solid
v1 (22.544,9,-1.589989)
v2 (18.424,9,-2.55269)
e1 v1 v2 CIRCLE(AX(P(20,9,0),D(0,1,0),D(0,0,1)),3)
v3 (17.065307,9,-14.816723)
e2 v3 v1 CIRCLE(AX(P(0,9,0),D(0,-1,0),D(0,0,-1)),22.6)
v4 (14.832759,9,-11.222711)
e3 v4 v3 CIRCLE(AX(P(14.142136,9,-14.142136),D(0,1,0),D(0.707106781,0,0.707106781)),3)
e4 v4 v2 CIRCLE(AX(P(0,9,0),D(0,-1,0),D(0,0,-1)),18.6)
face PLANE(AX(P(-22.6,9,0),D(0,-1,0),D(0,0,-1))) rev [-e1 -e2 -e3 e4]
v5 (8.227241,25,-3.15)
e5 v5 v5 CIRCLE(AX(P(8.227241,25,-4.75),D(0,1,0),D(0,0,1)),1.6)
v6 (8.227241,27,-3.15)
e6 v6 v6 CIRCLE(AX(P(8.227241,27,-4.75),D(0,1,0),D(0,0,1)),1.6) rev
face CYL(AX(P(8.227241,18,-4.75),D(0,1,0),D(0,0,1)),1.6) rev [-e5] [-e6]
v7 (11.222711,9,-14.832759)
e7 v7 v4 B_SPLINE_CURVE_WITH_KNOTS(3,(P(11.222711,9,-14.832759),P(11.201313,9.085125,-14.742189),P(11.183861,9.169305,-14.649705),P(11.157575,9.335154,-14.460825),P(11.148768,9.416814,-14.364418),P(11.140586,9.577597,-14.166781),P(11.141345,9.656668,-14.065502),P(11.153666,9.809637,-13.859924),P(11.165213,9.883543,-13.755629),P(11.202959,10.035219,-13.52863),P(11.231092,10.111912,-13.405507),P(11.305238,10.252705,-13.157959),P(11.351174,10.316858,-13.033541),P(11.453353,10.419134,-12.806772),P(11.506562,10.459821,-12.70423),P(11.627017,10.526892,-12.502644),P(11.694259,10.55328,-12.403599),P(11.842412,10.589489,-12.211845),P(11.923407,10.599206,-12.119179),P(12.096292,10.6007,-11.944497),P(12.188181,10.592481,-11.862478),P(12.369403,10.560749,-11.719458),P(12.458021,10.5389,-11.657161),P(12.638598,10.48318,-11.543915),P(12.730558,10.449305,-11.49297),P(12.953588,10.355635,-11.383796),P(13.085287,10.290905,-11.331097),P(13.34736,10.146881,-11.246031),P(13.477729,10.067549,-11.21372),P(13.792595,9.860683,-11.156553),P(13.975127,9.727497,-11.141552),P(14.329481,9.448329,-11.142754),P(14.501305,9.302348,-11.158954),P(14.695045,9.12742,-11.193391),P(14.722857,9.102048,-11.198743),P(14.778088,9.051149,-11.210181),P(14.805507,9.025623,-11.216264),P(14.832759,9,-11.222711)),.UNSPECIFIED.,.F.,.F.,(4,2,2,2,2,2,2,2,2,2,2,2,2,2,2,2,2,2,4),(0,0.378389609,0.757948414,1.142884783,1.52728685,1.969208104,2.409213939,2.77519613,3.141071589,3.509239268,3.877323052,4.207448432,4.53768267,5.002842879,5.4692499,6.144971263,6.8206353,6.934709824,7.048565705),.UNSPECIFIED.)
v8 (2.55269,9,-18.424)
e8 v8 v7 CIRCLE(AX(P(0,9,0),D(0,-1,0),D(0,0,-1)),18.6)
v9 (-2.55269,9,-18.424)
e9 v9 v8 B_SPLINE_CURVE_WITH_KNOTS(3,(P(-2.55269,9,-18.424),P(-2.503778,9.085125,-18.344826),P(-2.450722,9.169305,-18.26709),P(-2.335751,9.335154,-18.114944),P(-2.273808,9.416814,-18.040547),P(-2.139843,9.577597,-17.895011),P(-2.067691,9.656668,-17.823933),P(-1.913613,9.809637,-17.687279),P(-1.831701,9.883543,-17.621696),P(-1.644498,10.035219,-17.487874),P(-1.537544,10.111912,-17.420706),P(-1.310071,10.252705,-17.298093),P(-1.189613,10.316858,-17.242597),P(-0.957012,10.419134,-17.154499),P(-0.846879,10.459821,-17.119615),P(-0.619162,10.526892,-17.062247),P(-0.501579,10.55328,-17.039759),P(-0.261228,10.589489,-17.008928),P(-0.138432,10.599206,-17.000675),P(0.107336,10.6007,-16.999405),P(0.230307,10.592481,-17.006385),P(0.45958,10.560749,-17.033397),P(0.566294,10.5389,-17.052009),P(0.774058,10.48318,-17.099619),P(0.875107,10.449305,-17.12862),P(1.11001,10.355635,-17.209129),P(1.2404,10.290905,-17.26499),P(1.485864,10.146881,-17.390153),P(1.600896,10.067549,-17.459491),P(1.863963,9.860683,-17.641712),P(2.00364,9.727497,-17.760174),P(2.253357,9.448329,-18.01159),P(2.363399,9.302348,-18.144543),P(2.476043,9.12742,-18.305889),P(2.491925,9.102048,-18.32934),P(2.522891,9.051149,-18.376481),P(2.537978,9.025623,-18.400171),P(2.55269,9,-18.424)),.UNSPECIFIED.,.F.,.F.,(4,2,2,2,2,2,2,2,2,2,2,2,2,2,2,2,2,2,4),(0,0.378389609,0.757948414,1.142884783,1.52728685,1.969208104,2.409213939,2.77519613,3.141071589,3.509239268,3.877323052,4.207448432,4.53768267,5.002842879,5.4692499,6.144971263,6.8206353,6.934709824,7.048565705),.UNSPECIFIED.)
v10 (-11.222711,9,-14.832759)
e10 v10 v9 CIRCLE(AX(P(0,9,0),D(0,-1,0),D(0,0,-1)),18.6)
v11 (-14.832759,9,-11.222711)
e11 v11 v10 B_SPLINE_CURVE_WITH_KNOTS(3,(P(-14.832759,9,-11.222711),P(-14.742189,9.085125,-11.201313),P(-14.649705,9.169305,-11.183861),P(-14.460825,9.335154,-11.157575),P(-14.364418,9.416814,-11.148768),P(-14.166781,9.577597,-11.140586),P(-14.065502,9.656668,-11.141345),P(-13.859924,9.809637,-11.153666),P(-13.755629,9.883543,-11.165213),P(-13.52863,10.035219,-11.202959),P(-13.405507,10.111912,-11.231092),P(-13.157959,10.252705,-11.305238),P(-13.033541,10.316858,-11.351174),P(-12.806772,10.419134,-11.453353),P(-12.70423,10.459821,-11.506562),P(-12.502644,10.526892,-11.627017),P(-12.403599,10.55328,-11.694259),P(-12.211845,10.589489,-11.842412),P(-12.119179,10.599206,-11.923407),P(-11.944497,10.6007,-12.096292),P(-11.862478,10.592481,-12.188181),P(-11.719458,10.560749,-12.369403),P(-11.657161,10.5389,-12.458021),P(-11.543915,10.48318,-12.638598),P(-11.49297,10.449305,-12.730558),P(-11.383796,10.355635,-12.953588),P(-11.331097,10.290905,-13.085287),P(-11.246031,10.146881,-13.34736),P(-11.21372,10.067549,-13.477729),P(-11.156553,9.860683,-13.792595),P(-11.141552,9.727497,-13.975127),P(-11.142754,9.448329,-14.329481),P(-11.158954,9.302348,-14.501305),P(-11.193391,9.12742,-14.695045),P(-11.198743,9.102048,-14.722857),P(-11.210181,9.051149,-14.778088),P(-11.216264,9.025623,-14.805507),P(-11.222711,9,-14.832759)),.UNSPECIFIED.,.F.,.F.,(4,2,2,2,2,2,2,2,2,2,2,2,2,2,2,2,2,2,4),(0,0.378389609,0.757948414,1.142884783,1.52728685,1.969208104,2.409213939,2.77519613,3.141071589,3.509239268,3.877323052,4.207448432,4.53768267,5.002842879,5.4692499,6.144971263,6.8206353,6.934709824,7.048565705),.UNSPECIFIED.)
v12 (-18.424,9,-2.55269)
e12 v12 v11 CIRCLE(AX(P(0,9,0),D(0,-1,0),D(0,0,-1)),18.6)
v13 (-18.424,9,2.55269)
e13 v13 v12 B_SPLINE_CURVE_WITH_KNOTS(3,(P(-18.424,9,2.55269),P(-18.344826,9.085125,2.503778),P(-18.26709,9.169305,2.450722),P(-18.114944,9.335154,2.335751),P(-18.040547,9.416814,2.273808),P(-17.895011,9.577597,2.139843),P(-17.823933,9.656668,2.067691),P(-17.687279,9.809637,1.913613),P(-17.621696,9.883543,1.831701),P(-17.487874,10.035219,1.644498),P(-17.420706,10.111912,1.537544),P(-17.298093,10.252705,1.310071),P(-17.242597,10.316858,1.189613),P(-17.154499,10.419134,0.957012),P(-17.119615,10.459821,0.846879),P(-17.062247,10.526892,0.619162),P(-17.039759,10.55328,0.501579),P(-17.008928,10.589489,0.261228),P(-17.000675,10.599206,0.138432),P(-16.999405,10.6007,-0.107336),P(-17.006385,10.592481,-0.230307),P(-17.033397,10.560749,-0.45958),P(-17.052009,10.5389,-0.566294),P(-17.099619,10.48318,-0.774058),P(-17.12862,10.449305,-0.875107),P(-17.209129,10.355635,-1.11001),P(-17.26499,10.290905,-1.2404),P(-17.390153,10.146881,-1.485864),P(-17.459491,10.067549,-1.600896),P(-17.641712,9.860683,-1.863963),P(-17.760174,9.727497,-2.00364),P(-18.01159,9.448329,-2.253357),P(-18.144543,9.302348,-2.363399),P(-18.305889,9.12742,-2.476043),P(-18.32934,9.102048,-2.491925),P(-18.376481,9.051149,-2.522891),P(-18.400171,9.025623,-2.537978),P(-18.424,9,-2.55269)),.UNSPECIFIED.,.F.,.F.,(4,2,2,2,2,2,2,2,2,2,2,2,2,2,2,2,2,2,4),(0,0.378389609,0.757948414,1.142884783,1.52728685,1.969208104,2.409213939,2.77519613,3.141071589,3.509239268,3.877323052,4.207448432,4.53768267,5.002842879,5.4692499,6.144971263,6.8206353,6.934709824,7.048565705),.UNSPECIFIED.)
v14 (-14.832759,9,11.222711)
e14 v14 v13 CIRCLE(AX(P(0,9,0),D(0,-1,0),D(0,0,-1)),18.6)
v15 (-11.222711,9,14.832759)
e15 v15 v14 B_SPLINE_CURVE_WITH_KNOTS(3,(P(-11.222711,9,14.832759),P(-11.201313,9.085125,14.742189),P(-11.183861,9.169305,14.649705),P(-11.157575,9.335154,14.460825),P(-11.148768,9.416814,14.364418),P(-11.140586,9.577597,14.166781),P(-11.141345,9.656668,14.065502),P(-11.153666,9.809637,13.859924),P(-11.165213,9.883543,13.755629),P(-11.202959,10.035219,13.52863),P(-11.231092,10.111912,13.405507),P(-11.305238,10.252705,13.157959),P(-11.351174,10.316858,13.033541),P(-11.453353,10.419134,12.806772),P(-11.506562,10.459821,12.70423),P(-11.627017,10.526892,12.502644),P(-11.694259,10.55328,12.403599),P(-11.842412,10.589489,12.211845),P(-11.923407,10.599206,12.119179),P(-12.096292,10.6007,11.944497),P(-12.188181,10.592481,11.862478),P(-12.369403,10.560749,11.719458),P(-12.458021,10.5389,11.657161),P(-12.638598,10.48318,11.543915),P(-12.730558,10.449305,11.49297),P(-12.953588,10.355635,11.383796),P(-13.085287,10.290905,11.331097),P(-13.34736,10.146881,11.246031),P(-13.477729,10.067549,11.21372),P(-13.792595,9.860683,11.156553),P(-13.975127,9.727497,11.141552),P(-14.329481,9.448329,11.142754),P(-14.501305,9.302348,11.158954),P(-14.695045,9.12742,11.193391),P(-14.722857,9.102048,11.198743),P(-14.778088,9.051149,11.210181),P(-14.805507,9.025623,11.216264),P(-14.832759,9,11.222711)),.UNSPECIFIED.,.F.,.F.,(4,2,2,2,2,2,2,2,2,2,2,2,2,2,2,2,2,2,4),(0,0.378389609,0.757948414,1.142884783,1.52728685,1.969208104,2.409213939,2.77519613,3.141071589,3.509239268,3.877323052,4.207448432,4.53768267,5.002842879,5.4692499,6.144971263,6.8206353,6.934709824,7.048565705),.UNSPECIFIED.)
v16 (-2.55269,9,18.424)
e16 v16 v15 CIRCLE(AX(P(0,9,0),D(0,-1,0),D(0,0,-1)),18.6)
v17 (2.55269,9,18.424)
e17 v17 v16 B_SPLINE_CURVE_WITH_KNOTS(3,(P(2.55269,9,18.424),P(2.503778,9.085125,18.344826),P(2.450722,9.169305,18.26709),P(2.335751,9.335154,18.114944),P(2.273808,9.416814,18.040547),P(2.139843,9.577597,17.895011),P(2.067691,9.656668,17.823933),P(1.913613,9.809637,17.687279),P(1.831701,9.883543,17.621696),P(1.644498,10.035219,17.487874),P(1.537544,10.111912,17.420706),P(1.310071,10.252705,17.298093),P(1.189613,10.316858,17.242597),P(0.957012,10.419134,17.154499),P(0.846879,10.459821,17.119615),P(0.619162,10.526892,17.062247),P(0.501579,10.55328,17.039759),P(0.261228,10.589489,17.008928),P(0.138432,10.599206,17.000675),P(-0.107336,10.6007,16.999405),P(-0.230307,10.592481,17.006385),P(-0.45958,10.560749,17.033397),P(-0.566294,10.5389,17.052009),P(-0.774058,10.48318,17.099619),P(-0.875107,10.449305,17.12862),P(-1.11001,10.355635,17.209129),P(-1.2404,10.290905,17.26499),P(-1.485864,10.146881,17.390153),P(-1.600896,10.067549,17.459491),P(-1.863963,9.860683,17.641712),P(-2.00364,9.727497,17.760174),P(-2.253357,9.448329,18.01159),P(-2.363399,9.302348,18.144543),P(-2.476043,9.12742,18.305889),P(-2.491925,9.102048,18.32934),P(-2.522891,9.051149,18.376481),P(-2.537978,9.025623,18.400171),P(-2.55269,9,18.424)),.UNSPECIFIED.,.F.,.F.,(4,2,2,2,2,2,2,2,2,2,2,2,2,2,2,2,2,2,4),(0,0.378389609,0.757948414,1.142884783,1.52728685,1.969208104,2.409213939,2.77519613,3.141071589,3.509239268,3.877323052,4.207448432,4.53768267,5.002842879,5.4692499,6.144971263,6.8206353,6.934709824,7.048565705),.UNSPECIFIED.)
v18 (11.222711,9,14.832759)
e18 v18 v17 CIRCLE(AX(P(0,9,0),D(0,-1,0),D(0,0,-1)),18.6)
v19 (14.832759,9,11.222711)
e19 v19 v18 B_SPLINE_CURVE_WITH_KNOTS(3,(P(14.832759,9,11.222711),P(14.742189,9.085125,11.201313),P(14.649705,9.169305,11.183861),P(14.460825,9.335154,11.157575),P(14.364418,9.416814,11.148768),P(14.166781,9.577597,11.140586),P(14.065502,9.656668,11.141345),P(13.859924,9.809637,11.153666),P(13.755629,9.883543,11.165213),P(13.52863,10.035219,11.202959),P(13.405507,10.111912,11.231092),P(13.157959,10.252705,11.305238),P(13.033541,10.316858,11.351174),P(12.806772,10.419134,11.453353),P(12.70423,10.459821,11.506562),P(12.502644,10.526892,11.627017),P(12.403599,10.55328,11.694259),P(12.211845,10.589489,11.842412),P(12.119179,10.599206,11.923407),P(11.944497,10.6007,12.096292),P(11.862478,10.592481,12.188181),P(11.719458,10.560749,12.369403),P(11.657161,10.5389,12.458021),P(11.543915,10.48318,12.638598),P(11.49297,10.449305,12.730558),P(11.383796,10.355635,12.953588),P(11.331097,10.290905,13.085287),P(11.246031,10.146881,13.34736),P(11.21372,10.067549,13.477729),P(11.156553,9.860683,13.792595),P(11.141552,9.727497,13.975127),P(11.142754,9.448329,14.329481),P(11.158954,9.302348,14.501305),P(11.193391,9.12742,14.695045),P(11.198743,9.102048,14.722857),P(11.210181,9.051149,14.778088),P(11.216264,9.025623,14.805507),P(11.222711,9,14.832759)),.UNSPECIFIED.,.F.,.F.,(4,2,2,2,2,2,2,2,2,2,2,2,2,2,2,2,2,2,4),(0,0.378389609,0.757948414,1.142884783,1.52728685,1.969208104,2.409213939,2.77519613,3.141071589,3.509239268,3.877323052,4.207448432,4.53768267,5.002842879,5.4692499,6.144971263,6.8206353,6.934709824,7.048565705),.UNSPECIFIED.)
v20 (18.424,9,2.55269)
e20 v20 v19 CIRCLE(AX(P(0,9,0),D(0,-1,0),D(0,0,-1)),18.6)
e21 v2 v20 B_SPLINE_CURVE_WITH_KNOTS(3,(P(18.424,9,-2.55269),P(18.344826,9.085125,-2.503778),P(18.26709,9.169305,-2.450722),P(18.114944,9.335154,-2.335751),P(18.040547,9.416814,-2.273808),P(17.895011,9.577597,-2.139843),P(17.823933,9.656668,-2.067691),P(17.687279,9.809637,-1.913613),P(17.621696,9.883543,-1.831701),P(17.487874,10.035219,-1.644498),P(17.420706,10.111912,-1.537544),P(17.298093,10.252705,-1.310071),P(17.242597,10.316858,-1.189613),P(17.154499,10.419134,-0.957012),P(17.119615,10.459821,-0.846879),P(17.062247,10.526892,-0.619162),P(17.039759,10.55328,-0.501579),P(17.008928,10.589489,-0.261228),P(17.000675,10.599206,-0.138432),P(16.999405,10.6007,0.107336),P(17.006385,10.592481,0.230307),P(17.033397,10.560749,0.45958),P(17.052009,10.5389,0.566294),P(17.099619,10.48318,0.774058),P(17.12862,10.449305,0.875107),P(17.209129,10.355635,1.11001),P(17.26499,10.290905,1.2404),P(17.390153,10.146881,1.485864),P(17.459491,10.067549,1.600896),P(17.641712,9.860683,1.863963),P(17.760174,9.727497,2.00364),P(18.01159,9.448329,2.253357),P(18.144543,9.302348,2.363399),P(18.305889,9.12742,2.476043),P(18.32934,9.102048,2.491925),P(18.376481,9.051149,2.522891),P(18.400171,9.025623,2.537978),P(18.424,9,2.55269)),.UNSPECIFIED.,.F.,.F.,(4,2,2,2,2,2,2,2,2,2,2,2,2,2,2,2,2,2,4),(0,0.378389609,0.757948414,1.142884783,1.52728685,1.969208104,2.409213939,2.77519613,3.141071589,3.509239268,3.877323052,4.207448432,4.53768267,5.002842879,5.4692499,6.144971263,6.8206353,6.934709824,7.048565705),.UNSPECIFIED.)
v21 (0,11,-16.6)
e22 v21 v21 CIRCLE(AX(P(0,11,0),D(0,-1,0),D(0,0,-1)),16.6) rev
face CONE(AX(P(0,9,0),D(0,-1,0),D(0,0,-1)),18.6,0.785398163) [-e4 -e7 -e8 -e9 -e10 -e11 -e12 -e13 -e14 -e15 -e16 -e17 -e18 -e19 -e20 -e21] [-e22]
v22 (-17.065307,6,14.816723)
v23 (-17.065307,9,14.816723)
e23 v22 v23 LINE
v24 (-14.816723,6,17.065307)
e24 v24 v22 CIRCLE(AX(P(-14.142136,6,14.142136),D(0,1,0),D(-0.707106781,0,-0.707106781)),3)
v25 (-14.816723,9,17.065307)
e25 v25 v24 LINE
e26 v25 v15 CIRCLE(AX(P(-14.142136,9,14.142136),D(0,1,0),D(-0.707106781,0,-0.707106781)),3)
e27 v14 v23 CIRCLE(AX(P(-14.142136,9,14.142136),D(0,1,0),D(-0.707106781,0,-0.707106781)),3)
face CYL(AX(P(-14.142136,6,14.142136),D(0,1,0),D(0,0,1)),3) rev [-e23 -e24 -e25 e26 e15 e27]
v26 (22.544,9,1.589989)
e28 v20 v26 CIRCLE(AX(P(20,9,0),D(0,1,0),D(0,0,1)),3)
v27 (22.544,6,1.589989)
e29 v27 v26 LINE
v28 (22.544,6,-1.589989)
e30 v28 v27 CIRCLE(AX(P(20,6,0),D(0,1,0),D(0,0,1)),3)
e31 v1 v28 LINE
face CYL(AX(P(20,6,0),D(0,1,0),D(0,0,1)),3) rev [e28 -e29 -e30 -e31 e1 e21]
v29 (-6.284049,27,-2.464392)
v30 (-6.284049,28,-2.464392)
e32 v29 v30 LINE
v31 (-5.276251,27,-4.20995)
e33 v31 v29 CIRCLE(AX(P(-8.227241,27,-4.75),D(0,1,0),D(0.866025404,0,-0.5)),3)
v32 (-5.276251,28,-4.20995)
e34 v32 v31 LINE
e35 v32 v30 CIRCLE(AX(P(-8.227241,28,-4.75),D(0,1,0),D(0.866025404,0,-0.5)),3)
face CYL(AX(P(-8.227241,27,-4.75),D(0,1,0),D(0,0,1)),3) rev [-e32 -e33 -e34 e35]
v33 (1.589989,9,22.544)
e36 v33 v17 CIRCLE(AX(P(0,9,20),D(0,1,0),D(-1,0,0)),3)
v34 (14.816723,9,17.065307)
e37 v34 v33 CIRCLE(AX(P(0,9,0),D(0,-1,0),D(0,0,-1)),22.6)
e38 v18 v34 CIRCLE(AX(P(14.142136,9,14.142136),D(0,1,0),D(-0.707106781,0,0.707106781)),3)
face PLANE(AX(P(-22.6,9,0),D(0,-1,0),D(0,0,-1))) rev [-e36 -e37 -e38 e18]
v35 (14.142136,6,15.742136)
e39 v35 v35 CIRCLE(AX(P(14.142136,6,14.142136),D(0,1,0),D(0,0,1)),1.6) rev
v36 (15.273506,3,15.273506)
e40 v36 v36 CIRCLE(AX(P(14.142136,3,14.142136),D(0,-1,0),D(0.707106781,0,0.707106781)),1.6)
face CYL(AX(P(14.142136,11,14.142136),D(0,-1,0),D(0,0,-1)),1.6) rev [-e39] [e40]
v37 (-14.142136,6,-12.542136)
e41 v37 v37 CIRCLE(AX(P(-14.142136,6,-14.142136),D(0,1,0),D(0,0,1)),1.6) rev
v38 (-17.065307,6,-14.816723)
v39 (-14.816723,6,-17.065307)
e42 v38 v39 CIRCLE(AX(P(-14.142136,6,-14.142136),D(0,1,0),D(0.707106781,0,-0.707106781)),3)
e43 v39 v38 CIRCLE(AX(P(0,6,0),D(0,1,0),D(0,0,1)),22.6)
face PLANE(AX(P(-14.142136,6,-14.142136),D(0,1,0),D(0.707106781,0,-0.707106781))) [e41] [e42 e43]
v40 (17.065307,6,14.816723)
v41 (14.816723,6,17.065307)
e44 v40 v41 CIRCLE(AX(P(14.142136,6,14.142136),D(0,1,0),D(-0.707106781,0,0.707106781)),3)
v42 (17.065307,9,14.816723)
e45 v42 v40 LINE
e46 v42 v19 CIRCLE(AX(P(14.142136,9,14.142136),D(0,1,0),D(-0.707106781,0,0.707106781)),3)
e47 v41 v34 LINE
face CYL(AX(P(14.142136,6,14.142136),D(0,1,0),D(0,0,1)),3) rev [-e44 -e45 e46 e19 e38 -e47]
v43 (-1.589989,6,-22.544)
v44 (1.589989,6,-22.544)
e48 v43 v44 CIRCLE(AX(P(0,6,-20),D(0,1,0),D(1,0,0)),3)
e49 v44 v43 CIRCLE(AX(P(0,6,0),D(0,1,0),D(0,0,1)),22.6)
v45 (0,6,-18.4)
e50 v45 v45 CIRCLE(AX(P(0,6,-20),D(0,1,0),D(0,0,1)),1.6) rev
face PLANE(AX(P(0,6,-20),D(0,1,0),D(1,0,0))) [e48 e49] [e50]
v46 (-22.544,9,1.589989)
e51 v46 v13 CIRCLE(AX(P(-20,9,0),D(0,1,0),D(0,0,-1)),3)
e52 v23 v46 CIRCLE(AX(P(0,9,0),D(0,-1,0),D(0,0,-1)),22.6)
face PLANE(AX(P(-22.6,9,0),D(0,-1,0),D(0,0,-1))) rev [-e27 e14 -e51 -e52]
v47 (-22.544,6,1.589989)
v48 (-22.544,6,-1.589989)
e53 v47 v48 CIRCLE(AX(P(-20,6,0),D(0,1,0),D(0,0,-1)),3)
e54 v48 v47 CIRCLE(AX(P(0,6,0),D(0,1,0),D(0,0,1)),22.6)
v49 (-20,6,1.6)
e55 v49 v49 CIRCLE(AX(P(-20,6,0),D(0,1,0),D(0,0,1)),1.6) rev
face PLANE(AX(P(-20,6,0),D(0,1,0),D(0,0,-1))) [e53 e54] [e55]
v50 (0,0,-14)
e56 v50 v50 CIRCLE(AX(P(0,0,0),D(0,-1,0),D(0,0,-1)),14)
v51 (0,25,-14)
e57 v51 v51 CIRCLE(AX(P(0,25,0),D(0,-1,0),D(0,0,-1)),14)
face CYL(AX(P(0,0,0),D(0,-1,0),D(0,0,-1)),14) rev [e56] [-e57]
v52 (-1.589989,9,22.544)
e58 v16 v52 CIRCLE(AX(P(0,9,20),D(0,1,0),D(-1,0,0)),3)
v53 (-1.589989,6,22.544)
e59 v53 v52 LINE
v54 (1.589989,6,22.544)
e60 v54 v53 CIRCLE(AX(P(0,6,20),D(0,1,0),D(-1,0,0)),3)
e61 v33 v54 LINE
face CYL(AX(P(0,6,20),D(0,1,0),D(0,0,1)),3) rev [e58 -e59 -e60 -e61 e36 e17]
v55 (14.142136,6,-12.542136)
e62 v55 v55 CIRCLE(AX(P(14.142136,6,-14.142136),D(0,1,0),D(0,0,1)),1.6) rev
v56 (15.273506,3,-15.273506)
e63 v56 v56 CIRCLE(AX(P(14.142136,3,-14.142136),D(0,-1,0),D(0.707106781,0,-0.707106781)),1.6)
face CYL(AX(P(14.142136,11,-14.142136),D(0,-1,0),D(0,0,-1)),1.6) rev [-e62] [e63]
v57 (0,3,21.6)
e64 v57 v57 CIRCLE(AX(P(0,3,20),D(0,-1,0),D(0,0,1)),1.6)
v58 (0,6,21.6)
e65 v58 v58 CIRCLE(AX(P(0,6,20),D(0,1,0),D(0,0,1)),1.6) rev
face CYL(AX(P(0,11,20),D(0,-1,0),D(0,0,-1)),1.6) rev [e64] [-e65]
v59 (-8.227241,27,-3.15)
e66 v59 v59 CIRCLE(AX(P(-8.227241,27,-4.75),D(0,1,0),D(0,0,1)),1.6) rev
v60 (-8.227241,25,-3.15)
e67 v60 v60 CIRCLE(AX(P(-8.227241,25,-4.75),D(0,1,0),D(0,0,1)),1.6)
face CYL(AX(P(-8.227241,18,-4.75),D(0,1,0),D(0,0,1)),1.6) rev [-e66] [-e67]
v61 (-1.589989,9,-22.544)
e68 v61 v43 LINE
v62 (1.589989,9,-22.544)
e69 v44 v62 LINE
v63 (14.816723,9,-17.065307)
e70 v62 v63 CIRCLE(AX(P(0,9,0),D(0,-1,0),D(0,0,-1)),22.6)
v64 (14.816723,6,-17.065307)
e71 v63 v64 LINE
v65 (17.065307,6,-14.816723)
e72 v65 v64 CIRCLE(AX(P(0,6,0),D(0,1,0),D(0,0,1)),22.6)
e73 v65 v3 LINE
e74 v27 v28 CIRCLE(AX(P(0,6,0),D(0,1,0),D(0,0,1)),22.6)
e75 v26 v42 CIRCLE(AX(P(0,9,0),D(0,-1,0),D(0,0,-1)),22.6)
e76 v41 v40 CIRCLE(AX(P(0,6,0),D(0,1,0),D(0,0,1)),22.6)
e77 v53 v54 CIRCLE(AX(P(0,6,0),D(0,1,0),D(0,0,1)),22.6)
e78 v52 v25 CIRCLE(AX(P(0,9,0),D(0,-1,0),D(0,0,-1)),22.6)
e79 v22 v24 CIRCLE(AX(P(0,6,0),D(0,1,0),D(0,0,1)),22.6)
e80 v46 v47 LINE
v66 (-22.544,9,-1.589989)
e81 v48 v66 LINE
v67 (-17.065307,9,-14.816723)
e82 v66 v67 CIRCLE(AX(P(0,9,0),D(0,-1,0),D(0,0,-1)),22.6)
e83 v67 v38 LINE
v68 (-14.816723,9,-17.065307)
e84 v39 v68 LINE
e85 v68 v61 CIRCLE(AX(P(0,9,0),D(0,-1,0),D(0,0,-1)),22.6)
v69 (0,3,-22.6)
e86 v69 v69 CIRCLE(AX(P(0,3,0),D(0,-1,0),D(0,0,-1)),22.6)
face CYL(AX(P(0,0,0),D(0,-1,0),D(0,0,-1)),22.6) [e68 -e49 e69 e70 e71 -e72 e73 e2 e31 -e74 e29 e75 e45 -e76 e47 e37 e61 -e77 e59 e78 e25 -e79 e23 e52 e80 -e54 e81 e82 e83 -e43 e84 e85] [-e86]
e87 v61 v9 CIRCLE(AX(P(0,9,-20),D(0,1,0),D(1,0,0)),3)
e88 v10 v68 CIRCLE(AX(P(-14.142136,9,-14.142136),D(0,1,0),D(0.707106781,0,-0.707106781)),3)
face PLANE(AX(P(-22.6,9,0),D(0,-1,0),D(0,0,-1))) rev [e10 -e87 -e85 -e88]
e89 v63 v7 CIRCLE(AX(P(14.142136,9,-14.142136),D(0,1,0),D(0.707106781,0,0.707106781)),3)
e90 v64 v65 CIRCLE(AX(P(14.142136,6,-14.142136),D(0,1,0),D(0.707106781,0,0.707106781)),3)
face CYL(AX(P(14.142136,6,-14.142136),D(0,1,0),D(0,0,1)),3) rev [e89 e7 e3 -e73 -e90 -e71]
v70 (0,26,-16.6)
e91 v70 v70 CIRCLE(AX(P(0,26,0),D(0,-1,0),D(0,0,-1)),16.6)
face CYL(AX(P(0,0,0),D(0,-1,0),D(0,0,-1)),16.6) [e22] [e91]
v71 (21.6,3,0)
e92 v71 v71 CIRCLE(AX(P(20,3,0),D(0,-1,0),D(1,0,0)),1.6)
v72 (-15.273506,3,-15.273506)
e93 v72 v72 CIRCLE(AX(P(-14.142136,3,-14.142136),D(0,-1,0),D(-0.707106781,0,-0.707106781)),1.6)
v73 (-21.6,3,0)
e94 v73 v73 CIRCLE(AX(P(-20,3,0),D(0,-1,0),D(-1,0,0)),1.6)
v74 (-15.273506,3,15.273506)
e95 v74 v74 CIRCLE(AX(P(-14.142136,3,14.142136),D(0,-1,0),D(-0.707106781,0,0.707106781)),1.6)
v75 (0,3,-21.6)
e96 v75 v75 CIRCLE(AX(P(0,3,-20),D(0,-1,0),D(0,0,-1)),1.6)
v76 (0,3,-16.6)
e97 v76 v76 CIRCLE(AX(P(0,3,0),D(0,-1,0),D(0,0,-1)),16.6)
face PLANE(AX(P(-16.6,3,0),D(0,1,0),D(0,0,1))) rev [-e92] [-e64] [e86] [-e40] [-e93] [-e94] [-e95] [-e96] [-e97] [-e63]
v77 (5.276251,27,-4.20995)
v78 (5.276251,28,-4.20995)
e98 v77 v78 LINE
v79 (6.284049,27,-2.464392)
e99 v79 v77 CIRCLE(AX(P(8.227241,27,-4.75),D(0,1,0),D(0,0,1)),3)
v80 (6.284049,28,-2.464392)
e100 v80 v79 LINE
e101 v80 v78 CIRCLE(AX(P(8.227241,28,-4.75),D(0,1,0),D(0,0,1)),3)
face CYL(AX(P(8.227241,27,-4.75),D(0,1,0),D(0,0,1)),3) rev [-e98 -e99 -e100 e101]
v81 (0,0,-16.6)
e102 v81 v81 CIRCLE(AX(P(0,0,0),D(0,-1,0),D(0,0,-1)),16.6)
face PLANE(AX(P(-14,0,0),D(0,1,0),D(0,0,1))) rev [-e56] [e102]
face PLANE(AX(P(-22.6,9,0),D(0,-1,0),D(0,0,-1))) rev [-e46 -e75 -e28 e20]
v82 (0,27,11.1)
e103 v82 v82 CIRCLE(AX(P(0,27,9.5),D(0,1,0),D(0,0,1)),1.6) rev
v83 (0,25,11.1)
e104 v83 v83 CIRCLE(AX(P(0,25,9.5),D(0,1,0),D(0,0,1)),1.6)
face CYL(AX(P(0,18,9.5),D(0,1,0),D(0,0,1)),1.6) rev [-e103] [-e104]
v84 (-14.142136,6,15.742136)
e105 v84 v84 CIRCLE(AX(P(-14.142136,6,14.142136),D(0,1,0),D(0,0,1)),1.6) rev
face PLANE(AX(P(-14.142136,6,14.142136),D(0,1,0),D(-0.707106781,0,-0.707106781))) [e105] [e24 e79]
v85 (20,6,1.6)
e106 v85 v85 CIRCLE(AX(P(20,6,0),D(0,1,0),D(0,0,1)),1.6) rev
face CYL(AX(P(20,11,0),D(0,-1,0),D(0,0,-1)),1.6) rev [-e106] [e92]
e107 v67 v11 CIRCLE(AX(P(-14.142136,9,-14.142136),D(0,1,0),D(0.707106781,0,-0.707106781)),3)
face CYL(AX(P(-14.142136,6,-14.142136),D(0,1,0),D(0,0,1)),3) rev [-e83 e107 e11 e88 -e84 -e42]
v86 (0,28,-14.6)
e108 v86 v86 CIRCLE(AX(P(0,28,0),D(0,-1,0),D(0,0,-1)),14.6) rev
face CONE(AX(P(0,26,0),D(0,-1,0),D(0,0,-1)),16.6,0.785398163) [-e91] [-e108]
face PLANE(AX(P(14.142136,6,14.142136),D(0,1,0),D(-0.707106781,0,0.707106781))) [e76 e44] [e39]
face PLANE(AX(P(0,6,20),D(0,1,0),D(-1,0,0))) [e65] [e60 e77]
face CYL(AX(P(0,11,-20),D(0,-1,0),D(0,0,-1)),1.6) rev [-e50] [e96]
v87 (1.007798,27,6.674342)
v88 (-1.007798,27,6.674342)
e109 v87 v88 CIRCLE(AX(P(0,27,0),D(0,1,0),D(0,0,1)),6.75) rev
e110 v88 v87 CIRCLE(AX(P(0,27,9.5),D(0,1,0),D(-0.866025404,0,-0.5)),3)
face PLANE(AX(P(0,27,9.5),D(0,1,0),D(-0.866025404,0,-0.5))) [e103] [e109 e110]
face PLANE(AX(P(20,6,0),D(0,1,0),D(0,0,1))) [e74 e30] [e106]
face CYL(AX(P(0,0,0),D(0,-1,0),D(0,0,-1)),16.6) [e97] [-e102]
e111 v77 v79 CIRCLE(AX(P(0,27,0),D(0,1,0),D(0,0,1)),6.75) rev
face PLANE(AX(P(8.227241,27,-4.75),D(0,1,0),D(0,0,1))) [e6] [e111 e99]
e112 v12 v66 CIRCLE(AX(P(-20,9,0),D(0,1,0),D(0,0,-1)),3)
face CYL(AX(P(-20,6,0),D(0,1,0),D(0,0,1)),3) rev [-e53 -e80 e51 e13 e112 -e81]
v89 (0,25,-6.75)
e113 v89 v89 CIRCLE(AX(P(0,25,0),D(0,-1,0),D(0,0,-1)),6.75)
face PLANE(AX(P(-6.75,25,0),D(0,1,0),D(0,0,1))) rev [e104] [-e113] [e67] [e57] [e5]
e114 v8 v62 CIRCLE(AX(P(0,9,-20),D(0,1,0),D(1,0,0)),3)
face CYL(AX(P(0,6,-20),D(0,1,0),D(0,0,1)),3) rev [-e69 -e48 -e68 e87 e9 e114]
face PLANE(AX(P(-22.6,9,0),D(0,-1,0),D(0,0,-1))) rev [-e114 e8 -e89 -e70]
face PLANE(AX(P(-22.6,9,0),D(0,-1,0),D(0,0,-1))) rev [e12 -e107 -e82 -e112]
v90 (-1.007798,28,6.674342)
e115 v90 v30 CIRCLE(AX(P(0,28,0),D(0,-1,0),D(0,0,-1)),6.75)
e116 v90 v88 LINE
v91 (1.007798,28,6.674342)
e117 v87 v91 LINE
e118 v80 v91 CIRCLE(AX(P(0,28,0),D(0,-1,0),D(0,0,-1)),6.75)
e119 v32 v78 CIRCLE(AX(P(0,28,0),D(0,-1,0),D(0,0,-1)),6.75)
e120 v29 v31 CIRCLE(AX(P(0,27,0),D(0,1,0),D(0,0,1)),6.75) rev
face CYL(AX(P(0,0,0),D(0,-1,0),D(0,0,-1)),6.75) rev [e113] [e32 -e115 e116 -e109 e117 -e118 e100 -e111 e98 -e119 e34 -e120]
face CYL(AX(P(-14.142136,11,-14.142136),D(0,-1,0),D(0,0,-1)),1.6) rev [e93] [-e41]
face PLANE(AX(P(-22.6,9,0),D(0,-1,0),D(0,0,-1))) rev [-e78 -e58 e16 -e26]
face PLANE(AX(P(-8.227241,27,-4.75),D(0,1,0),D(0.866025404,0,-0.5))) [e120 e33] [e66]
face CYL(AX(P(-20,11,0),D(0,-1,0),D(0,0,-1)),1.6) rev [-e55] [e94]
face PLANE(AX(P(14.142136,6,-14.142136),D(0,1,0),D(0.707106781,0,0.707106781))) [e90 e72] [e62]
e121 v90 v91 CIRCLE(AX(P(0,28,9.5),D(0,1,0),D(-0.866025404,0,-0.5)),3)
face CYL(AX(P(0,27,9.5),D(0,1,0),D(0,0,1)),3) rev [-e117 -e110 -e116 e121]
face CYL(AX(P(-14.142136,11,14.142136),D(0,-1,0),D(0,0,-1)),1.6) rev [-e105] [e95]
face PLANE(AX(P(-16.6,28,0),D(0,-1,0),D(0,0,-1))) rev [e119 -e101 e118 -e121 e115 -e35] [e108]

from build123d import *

# Parameters (mm, degrees)
SKETCH_2_R               = 1.6
CUT_EXTRUDE_1_DEPTH      = 8
PATTERN_CIRCULAR_1_COUNT = 8
SKETCH_3_R               = 1.6
CUT_EXTRUDE_2_DEPTH      = 10
SKETCH_4_R               = 3
CUT_EXTRUDE_6_DEPTH      = 3
PATTERN_CIRCULAR_2_COUNT = 8
SKETCH_5_R               = 3
CUT_EXTRUDE_7_DEPTH      = 1
PATTERN_CIRCULAR_3_COUNT = 3
CHAMFER_1_SIZE           = 2


with BuildPart() as part:
    # 草图1 → 旋转1 (revolve)
    with BuildSketch(Plane.XY, mode=Mode.PRIVATE) as revolve_1_sk:
        Polygon((-14, 0), (-16.6, 0), (-16.6, 3), (-22.6, 3), (-22.6, 9), (-16.6, 9), (-16.6, 28), (-6.75, 28), (-6.75, 25), (-14, 25), align=None)
    revolve(revolve_1_sk.sketch.rotate(Axis((0, 0, 0), (0, 1, 0)), 270), axis=Axis((0, 0, 0), (0, 1, 0)))

    # 草图2 → 切除-拉伸1 (cut)
    with BuildSketch(Plane.XZ.offset(-3)):
        with Locations(Location((0, -20, 0), (0, 0, 270))):
            Circle(SKETCH_2_R)
    cut_extrude_1 = extrude(amount=-CUT_EXTRUDE_1_DEPTH, mode=Mode.SUBTRACT)

    # 阵列(圆周)1: 切除-拉伸1 ×8 about axis
    pattern_circular_1_axis = Axis((0, 0, 0), (0, 1, 0))
    for i in range(1, PATTERN_CIRCULAR_1_COUNT):
        add(cut_extrude_1.rotate(pattern_circular_1_axis, i * 360 / PATTERN_CIRCULAR_1_COUNT), mode=Mode.SUBTRACT)

    # 草图3 → 切除-拉伸2 (cut)
    with BuildSketch(Plane(origin=(0, 28, 0), x_dir=(1, 0, 0), z_dir=(0, 1, 0))):
        with Locations(Location((0, -9.5, 0), (0, 0, 270))):
            Circle(SKETCH_3_R)
        with Locations(Location((-8.227241336, 4.75, 0), (0, 0, 270))):
            Circle(SKETCH_3_R)
        with Locations(Location((8.227241336, 4.75, 0), (0, 0, 270))):
            Circle(SKETCH_3_R)
    extrude(amount=-CUT_EXTRUDE_2_DEPTH, mode=Mode.SUBTRACT)

    # 草图4 → 切除-拉伸6 (cut)
    with BuildSketch(Plane(origin=(0, 9, 0), x_dir=(1, 0, 0), z_dir=(0, 1, 0))):
        with Locations((20, 0)):
            Circle(SKETCH_4_R)
    cut_extrude_6 = extrude(amount=-CUT_EXTRUDE_6_DEPTH, mode=Mode.SUBTRACT)

    # 阵列(圆周)2: 切除-拉伸6 ×8 about axis
    pattern_circular_2_axis = Axis((0, 0, 0), (0, 1, 0))
    for i in range(1, PATTERN_CIRCULAR_2_COUNT):
        add(cut_extrude_6.rotate(pattern_circular_2_axis, i * 360 / PATTERN_CIRCULAR_2_COUNT), mode=Mode.SUBTRACT)

    # 草图5 → 切除-拉伸7 (cut)
    with BuildSketch(Plane(origin=(0, 28, 0), x_dir=(1, 0, 0), z_dir=(0, 1, 0))):
        with Locations((8.227241336, 4.75)):
            Circle(SKETCH_5_R)
    cut_extrude_7 = extrude(amount=-CUT_EXTRUDE_7_DEPTH, mode=Mode.SUBTRACT)

    # 阵列(圆周)3: 切除-拉伸7 ×3 about axis
    pattern_circular_3_axis = Axis((0, 0, 0), (0, 1, 0))
    for i in range(1, PATTERN_CIRCULAR_3_COUNT):
        add(cut_extrude_7.rotate(pattern_circular_3_axis, i * 360 / PATTERN_CIRCULAR_3_COUNT), mode=Mode.SUBTRACT)

    # 倒角1
    # the kernel refuses this chamfer: 2 mm, written as the material it adds along each edge
    with BuildSketch(Plane(origin=(0, 9, 0), x_dir=(0, 0, -1), z_dir=(1, 0, 0))) as chamfer_1_piece_1_section:
        Polygon((16.6 + CHAMFER_1_SIZE, 0), (16.6, CHAMFER_1_SIZE), (16.6, 0), align=None)
    chamfer_1_piece_1 = revolve(axis=Axis((0, 9, 0), (0, 1, 0)), mode=Mode.PRIVATE)
    chamfer_1_piece_1 = chamfer_1_piece_1 - Plane(origin=(-14.142135624, 9.253857846, 14.142135624), x_dir=(-0.7071067811865477, 0, 0.7071067811865475), z_dir=(0, 1, 0)) * Cylinder(3, 75, mode=Mode.PRIVATE)
    chamfer_1_piece_1 = chamfer_1_piece_1 - Plane(origin=(20, 9.253857846, 0), x_dir=(1, 0, 0), z_dir=(0, 1, 0)) * Cylinder(3, 75, mode=Mode.PRIVATE)
    chamfer_1_piece_1 = chamfer_1_piece_1 - Plane(origin=(14.142135624, 9.253857846, 14.142135624), x_dir=(0.7071067811865474, 0, 0.7071067811865477), z_dir=(0, 1, 0)) * Cylinder(3, 75, mode=Mode.PRIVATE)
    chamfer_1_piece_1 = chamfer_1_piece_1 - Plane(origin=(0, 9.253857846, 20), x_dir=(0, 0, 1), z_dir=(0, 1, 0)) * Cylinder(3, 75, mode=Mode.PRIVATE)
    chamfer_1_piece_1 = chamfer_1_piece_1 - Plane(origin=(-20, 9.253857846, 0), x_dir=(-1, 0, 0), z_dir=(0, 1, 0)) * Cylinder(3, 75, mode=Mode.PRIVATE)
    chamfer_1_piece_1 = chamfer_1_piece_1 - Plane(origin=(-14.142135624, 9.253857846, -14.142135624), x_dir=(-0.7071067811865475, 0, -0.7071067811865476), z_dir=(0, 1, 0)) * Cylinder(3, 75, mode=Mode.PRIVATE)
    chamfer_1_piece_1 = chamfer_1_piece_1 - Plane(origin=(0, 9.253857846, -20), x_dir=(0, 0, -1), z_dir=(0, 1, 0)) * Cylinder(3, 75, mode=Mode.PRIVATE)
    chamfer_1_piece_1 = chamfer_1_piece_1 - Plane(origin=(14.142135624, 9.253857846, -14.142135624), x_dir=(0.7071067811865476, 0, -0.7071067811865475), z_dir=(0, 1, 0)) * Cylinder(3, 75, mode=Mode.PRIVATE)
    add(chamfer_1_piece_1)
    # the kernel refuses this chamfer: 2 mm, written as the material it takes off along each edge
    with BuildSketch(Plane(origin=(0, 28, 0), x_dir=(0, 0, -1), z_dir=(1, 0, 0))) as chamfer_1_2_piece_1:
        Polygon((16.6 - CHAMFER_1_SIZE, 0), (16.6, -CHAMFER_1_SIZE), (16.6, 0), align=None)
    revolve(axis=Axis((0, 28, 0), (0, 1, 0)), mode=Mode.SUBTRACT)


solid = part.part
